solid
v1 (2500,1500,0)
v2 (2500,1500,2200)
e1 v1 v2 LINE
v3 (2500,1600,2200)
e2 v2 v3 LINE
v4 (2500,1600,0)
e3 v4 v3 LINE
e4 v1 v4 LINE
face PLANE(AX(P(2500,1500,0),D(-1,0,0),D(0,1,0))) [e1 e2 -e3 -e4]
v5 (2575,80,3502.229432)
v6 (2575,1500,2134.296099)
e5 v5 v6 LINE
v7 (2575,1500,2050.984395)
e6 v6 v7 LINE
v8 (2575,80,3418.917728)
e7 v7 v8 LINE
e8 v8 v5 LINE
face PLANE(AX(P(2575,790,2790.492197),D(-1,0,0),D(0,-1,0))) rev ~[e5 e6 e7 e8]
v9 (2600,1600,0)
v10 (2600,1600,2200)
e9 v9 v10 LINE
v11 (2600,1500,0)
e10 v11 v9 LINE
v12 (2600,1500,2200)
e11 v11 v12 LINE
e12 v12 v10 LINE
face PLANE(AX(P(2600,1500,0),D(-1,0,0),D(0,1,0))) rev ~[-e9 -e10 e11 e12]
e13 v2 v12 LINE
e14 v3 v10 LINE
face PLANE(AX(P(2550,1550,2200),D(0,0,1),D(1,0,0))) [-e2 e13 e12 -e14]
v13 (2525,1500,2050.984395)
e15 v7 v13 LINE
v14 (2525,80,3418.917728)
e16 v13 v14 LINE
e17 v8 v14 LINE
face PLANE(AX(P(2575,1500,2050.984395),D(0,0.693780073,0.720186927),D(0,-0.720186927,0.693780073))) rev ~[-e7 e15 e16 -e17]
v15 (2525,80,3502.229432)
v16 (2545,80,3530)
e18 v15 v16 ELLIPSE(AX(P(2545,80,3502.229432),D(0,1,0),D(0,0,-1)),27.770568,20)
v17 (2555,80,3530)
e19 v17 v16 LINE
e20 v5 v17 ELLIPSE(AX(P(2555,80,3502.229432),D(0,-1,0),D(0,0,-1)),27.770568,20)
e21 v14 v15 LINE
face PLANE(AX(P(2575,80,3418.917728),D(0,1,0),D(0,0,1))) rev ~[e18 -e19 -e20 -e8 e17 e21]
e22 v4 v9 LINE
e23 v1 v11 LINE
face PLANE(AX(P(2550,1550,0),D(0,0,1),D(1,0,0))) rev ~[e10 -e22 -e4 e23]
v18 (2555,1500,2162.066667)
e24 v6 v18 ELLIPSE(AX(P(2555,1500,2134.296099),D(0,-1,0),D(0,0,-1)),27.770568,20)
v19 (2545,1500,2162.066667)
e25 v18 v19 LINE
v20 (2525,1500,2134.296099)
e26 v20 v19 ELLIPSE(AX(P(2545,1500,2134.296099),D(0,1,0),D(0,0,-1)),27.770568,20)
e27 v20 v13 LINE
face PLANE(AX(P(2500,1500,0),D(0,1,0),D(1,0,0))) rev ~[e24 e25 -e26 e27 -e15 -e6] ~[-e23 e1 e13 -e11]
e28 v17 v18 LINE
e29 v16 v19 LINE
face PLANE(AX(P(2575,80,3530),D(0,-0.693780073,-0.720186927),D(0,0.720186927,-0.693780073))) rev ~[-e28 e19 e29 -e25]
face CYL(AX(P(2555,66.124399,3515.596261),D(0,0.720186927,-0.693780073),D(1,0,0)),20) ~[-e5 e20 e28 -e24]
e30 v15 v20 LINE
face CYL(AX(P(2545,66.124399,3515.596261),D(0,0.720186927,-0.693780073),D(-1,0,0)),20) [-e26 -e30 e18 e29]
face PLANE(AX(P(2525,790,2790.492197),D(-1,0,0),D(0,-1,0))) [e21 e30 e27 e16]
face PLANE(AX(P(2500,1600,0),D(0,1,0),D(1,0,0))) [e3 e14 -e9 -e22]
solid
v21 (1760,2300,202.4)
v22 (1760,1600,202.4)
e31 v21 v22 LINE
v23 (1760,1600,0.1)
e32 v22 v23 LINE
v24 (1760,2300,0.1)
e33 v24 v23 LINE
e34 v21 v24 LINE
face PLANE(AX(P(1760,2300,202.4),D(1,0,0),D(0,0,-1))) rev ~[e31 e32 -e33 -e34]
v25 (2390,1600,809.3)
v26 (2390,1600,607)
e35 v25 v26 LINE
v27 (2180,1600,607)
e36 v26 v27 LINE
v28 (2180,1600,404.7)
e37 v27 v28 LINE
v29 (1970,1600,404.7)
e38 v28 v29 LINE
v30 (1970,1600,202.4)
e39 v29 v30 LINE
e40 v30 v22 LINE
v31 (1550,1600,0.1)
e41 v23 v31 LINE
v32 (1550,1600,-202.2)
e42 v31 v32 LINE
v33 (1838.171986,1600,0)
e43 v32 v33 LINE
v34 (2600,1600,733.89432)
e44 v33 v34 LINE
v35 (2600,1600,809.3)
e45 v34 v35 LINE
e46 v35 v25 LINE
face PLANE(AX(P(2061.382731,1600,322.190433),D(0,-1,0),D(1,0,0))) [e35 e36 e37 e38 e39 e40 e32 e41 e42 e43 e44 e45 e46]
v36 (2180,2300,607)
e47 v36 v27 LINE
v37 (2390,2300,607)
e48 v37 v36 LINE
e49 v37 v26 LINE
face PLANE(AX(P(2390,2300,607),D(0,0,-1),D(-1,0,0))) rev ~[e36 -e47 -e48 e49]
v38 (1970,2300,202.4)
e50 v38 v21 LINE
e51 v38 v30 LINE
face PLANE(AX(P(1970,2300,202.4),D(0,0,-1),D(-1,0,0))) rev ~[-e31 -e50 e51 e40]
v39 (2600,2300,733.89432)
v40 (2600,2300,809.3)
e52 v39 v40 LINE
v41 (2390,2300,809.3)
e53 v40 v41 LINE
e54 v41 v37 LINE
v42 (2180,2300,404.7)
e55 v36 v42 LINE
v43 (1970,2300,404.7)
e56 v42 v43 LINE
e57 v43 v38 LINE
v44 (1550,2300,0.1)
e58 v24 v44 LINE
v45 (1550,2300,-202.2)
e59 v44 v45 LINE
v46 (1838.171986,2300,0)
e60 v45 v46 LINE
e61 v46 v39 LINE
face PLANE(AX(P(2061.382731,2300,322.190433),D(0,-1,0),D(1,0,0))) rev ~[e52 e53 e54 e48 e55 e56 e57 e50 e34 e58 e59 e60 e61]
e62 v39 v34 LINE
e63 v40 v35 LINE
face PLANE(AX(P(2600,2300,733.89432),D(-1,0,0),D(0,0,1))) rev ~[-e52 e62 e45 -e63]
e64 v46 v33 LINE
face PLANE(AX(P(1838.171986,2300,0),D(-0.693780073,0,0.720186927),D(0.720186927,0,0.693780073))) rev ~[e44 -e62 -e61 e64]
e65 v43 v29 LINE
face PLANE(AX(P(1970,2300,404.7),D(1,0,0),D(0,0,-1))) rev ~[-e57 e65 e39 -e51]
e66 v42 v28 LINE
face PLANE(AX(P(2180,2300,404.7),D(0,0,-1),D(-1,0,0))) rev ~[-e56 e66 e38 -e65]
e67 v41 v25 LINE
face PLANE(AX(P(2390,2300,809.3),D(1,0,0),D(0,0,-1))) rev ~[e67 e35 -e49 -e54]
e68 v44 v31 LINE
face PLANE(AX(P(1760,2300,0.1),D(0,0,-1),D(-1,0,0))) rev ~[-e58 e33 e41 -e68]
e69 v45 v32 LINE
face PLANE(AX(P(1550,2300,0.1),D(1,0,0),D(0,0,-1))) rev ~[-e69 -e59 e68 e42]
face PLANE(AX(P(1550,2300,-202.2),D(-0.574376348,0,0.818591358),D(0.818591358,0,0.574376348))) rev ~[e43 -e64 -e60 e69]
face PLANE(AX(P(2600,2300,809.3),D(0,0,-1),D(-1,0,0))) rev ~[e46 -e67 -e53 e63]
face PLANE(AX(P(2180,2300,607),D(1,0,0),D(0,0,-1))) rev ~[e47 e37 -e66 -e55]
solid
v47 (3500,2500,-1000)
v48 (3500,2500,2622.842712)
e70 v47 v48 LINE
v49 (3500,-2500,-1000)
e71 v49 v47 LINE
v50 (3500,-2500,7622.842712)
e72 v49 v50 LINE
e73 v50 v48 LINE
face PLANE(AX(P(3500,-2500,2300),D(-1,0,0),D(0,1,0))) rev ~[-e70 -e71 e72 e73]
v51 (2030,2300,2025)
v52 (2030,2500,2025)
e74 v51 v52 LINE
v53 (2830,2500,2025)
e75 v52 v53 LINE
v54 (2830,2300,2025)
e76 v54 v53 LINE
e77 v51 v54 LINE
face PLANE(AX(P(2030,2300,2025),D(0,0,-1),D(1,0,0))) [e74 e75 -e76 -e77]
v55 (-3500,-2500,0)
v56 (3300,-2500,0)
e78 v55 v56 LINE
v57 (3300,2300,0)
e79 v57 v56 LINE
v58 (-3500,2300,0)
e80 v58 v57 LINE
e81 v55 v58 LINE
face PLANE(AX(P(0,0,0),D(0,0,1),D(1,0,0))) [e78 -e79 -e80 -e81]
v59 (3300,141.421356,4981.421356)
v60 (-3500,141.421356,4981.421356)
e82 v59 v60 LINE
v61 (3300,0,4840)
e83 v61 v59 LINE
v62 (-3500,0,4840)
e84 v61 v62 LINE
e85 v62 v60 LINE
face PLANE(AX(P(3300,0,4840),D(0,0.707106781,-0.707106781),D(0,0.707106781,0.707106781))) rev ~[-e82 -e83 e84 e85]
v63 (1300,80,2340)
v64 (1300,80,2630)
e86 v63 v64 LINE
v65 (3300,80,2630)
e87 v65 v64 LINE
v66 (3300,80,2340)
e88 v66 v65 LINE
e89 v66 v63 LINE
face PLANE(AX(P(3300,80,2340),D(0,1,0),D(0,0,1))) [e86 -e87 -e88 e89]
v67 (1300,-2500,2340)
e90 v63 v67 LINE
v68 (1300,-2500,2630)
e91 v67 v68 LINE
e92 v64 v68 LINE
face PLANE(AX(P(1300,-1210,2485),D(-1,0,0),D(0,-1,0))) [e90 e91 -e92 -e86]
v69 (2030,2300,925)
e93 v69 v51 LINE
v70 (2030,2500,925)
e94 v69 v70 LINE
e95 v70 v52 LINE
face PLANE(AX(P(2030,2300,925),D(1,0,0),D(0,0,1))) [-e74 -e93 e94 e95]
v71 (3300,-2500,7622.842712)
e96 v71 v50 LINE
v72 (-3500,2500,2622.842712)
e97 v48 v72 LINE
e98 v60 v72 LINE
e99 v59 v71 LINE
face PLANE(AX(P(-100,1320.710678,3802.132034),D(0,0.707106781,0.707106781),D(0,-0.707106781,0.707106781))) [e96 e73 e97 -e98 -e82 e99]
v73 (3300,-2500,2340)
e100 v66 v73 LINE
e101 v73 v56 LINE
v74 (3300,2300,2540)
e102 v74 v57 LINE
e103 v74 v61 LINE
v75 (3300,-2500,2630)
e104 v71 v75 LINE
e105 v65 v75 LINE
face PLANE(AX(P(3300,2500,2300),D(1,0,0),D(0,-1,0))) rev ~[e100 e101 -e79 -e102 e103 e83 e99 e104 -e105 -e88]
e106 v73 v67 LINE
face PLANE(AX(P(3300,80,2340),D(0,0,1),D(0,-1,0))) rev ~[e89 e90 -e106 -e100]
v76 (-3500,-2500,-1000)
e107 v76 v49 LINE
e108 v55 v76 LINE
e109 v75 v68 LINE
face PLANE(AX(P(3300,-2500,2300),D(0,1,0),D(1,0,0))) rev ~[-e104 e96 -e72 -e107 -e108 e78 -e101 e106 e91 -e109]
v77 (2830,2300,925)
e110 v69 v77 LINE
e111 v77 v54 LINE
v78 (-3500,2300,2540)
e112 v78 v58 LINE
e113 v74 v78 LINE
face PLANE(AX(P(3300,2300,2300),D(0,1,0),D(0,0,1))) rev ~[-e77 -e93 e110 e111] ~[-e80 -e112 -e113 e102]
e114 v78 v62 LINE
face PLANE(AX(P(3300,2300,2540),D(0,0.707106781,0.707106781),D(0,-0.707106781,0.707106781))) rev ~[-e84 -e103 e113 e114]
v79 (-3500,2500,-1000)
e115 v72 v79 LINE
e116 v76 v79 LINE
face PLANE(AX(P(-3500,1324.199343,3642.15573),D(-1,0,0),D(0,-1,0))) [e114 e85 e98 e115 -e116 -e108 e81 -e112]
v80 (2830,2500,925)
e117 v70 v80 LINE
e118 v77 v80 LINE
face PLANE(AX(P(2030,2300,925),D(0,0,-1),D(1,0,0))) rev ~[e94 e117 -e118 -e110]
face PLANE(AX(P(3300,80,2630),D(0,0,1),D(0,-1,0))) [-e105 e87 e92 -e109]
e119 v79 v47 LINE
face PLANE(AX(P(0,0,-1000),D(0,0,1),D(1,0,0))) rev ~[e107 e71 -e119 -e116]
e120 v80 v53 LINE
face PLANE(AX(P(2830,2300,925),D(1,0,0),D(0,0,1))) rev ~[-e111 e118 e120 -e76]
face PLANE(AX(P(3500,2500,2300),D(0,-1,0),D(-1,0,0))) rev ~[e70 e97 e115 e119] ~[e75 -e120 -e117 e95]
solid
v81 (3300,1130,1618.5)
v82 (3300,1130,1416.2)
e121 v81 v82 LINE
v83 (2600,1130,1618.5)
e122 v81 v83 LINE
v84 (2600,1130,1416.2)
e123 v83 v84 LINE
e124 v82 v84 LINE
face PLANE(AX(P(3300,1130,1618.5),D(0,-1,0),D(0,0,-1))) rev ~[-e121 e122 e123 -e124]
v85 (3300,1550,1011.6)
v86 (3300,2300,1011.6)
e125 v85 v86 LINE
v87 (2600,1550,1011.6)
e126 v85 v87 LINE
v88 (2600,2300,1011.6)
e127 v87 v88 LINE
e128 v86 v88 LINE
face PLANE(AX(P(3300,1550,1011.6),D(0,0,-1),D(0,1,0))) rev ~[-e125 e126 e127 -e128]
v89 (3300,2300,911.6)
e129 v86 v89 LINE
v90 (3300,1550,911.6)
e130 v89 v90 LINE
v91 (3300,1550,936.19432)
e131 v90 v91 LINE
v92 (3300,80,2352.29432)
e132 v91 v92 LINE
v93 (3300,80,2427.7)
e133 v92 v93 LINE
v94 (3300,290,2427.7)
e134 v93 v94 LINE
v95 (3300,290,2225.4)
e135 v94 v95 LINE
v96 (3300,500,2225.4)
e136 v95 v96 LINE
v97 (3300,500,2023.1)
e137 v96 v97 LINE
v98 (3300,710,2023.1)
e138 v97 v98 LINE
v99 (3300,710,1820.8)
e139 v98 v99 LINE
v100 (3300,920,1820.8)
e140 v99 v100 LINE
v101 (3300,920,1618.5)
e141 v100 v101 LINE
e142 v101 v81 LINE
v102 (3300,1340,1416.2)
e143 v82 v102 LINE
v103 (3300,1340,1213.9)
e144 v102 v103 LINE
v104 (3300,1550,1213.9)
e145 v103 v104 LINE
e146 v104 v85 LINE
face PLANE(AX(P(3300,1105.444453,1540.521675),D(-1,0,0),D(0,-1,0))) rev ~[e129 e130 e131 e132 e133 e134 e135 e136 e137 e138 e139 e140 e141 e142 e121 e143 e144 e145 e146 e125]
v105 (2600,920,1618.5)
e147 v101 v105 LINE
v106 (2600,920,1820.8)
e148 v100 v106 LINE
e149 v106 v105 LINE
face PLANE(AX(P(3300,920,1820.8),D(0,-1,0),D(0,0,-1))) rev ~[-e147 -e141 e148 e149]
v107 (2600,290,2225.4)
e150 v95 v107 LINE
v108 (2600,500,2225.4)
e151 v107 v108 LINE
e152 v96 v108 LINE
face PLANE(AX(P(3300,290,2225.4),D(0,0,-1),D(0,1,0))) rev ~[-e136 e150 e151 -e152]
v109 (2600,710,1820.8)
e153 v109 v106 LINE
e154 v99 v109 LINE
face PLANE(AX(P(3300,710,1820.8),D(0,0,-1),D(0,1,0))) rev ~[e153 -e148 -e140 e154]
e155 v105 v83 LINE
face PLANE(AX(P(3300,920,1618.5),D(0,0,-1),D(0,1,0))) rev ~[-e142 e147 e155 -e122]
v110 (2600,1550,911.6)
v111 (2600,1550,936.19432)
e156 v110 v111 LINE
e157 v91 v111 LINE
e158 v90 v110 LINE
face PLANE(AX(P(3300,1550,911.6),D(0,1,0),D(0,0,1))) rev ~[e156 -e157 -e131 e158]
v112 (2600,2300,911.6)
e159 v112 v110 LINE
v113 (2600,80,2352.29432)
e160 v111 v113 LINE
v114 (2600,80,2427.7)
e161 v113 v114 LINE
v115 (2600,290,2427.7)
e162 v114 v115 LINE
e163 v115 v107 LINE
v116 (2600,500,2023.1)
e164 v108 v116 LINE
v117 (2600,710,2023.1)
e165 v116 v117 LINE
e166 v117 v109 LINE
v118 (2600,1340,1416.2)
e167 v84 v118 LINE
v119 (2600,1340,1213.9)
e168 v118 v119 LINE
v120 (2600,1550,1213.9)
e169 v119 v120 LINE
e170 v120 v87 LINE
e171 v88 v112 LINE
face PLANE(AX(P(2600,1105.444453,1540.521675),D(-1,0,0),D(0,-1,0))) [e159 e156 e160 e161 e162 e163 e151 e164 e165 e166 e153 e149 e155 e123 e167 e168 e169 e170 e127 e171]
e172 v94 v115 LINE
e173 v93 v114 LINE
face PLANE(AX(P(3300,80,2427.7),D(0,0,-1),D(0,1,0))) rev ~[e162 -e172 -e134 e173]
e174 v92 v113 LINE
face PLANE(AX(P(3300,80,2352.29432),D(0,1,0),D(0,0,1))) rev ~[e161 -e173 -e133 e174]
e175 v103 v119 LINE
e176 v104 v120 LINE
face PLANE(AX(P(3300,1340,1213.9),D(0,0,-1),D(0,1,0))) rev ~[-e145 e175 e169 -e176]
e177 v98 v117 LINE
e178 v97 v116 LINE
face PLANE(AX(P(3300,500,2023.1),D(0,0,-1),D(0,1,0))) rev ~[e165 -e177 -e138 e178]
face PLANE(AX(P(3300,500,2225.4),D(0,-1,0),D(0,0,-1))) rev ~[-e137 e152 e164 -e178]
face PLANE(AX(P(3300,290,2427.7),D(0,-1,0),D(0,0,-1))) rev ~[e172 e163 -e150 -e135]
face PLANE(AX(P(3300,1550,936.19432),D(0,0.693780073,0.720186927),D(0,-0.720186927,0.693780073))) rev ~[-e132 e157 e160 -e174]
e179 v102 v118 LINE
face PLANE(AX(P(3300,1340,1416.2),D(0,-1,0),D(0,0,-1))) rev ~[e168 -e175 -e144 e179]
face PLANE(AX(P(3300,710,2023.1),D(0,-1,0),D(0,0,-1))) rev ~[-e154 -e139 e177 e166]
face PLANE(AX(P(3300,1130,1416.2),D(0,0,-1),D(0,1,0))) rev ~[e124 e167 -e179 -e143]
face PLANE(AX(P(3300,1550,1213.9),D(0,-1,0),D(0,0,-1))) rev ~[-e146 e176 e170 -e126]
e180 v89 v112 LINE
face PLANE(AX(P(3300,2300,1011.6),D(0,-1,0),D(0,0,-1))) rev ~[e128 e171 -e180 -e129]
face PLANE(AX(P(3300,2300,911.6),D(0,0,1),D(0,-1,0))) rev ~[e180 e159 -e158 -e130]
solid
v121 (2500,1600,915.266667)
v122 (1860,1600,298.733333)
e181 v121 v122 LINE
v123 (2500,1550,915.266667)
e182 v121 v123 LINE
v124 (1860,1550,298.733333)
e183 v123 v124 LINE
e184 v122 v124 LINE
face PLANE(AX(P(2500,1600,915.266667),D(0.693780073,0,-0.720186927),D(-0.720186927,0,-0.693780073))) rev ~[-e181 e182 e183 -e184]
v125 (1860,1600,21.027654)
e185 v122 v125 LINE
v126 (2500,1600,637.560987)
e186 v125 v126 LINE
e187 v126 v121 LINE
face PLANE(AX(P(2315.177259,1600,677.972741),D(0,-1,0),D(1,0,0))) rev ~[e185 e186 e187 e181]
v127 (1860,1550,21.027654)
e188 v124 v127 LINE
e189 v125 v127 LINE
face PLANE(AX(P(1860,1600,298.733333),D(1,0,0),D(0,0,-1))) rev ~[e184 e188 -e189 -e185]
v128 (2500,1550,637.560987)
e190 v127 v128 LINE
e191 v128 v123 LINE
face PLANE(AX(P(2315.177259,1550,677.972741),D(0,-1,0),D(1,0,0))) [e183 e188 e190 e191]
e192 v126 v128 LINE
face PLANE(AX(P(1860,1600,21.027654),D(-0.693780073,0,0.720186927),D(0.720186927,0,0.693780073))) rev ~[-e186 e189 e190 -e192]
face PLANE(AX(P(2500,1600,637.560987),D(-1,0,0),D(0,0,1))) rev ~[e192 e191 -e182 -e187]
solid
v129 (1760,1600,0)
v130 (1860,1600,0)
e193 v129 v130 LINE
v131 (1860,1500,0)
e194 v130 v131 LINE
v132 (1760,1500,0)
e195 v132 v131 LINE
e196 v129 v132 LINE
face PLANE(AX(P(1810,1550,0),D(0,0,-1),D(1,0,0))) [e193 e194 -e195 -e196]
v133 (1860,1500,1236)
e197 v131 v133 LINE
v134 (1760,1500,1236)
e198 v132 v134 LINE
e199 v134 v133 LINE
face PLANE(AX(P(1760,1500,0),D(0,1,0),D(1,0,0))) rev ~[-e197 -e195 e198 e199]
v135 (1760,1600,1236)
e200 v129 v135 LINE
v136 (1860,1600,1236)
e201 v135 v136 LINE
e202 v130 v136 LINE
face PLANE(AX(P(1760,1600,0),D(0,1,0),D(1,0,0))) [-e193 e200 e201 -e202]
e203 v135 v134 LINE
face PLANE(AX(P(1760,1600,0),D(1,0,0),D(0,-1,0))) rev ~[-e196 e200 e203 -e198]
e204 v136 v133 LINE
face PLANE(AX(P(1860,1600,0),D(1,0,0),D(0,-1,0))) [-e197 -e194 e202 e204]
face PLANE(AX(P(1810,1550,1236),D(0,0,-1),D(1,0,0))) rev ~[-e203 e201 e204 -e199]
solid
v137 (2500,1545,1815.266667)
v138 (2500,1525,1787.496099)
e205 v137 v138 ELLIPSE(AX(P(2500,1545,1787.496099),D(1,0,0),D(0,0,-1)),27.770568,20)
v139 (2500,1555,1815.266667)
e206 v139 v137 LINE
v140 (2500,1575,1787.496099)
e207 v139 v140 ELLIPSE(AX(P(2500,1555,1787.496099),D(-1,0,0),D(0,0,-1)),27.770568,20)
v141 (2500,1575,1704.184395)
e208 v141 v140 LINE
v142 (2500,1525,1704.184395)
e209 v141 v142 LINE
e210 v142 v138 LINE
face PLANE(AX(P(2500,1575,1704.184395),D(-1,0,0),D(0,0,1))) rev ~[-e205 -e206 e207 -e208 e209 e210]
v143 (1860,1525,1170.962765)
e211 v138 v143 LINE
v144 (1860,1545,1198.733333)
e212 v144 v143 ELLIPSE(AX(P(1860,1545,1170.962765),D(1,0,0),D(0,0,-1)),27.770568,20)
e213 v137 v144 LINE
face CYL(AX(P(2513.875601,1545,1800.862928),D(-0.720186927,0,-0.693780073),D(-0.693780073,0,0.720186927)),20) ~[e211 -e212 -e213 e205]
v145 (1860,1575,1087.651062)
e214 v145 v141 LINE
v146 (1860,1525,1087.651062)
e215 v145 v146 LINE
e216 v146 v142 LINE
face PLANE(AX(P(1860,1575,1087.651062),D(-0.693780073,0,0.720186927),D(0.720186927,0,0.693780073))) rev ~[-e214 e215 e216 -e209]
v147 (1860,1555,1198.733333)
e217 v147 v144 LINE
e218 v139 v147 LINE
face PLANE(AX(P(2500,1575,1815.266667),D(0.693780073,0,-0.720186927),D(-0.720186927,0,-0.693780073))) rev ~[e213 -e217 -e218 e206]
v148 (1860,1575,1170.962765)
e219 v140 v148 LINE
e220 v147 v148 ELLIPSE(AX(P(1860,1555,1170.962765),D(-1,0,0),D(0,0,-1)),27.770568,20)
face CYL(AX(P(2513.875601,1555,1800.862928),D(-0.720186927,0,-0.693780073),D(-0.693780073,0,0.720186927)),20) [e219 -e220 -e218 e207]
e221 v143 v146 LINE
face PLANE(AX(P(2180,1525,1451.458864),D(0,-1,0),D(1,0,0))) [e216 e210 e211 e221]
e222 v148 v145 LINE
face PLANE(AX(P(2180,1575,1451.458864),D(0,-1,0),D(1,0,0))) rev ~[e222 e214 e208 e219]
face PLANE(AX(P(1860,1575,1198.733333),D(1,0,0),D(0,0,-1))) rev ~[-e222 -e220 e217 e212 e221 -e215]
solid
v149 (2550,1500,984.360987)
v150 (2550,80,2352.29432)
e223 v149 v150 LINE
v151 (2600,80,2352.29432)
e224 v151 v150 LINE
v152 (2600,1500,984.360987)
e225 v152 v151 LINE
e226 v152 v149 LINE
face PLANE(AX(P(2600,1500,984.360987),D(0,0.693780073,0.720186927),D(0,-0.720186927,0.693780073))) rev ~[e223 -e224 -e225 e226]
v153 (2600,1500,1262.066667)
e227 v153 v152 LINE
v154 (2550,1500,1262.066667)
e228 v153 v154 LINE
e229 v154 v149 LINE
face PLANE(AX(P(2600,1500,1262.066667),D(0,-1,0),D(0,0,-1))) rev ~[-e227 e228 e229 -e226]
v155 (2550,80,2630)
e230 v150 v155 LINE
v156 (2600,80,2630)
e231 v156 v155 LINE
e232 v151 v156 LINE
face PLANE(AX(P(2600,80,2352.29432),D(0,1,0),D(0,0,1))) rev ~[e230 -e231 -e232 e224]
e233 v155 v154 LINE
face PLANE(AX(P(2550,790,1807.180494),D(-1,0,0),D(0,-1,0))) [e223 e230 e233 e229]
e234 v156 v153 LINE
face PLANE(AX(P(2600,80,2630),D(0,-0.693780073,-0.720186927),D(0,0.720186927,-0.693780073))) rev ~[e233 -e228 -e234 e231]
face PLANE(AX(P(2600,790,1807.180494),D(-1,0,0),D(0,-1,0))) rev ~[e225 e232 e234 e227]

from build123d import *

# Parameters (mm, degrees)
F0_W      = 7000
F0_H      = 5000
F1_DEPTH  = 1000
F3_DEPTH  = 2300
F5_DEPTH  = 6800
F6_REACH  = 7685.420757516
F7_W      = 2580
F7_H      = 290
F8_DEPTH  = 2000
F10_DEPTH = 700
F12_DEPTH = 700
F13_W     = 800
F13_H     = 1100
F14_DEPTH = 200.001
F15_W     = 100
F15_H     = 100
F16_DEPTH = 2200
F18_START = 25
F18_DEPTH = 50
F19_W     = 100
F19_H     = 100
F20_DEPTH = 1236
F23_DEPTH = 50
F25_DEPTH = 50
F26_START = 25
F26_DEPTH = 50
F27_R     = 20
F27_2_R   = 20


with BuildPart() as f1:
    # F0 (on Top) → F1 (new body)
    with BuildSketch(Plane.XY):
        Rectangle(F0_W, F0_H)
    extrude(amount=-F1_DEPTH)

    # F2 (on face) → F3 (join)
    with BuildSketch(Plane.XY):
        Polygon((3500, -2500), (3500, 2500), (-3500, 2500), (-3500, 2300), (3300, 2300), (3300, -2500), align=None)
    extrude(amount=F3_DEPTH)

    # F4 (on face) → F5 (join, through all)
    with BuildSketch(Plane(origin=(3300, 0, 0), x_dir=(0, -1, 0), z_dir=(-1, 0, 0))):
        Polygon((-2300, 2300), (-2300, 2540), (0, 4840), (-141.4213562373, 4981.4213562373), (-2500, 2622.8427124746), (-2500, 2300), align=None)
    extrude(amount=F5_DEPTH)

    f6_end = Plane(origin=(-100, 1320.7106781187, 3802.132034356), x_dir=(0, -0.7071067812, 0.7071067812), z_dir=(0, 0.7071067812, 0.7071067812))
    # F3_face (on face) → F6 (join, up to a plane its end follows)
    with BuildSketch(Plane(origin=(3400, 0, 2300), x_dir=(1, 0, 0), z_dir=(0, 0, 1))):
        Polygon((-100, -2500), (100, -2500), (100, 2500), (-100, 2500), (-100, 2300), align=None)
    f6_long = extrude(amount=F6_REACH, mode=Mode.PRIVATE)
    add(split(f6_long, bisect_by=f6_end, keep=Keep.BOTTOM, mode=Mode.PRIVATE))

    # F7 (on face) → F8 (join)
    with BuildSketch(Plane(origin=(3300, 0, 0), x_dir=(0, -1, 0), z_dir=(-1, 0, 0))):
        with Locations((1210, 2485)):
            Rectangle(F7_W, F7_H)
    extrude(amount=F8_DEPTH)

    # F13 (on face) → F14 (cut, through all)
    with BuildSketch(Plane.XZ.offset(-2300)):
        with Locations((2430, 1475)):
            Rectangle(F13_W, F13_H)
    extrude(amount=-F14_DEPTH, mode=Mode.SUBTRACT)


with BuildPart() as f10:
    # F9 (on face) → F10 (new body)
    with BuildSketch(Plane(origin=(3300, 0, 0), x_dir=(0, -1, 0), z_dir=(-1, 0, 0))):
        Polygon((-80, 2427.7), (-290, 2427.7), (-290, 2225.4), (-500, 2225.4), (-500, 2023.1), (-710, 2023.1), (-710, 1820.8), (-920, 1820.8), (-920, 1618.5), (-1130, 1618.5), (-1130, 1416.2), (-1340, 1416.2), (-1340, 1213.9), (-1550, 1213.9), (-1550, 1011.6), (-2300, 1011.6), (-2300, 911.6), (-1550, 911.6), (-1550, 936.1943204678), (-80, 2352.2943204678), align=None)
    extrude(amount=F10_DEPTH)


with BuildPart() as f12:
    # F11 (on face) → F12 (new body)
    with BuildSketch(Plane.XZ.offset(-2300)):
        Polygon((2600, 733.8943204678), (2600, 809.3), (2390, 809.3), (2390, 607), (2180, 607), (2180, 404.7), (1970, 404.7), (1970, 202.4), (1760, 202.4), (1760, 0.1), (1550, 0.1), (1550, -202.2), (1838.1719856736, 0), align=None)
    extrude(amount=F12_DEPTH)


with BuildPart() as f16:
    # F15 (on face) → F16 (new body)
    with BuildSketch(Plane.XY):
        with Locations((2550, 1550)):
            Rectangle(F15_W, F15_H)
    extrude(amount=F16_DEPTH)

    # F17 (on face) → F18 (join)
    with BuildSketch(Plane(origin=(2600, 0, 0), x_dir=(0, -1, 0), z_dir=(-1, 0, 0)).offset(F18_START)):
        Polygon((-80, 3530), (-1500, 2162.0666666667), (-1500, 2050.9843948538), (-80, 3418.9177281871), align=None)
    extrude(amount=F18_DEPTH)

    # F27
    f27_edges = [f16.edges().sort_by_distance(p)[0] for p in [
        (2525, 790, 2846.033333),
        (2575, 790, 2846.033333),
    ]]
    fillet(f27_edges, radius=F27_R)


with BuildPart() as f20:
    # F19 (on face) → F20 (new body)
    with BuildSketch(Plane(origin=(0, 0, 0), x_dir=(1, 0, 0), z_dir=(0, 0, -1))):
        with Locations((1810, -1550)):
            Rectangle(F19_W, F19_H)
    extrude(amount=-F20_DEPTH)


with BuildPart() as f23:
    # F22 (on face) → F23 (new body)
    with BuildSketch(Plane.XZ.offset(-1600)):
        Polygon((2390, 607), (2390, 809.3), (2180, 607), align=None)
        Polygon((1860, 202.4), (1860, 21.0276538011), (2500, 637.5609871345), (2500, 809.3), (2390, 809.3), (2390, 607), (2180, 607), (2180, 404.7), (1970, 404.7), (1970, 202.4), align=None)
        Polygon((2180, 607), (1970, 404.7), (2180, 404.7), align=None)
        Polygon((1860, 298.7333333333), (1860, 202.4), (1970, 202.4), (1970, 404.7), align=None)
        Polygon((2390, 809.3), (2500, 809.3), (2500, 915.2666666667), align=None)
    extrude(amount=F23_DEPTH)


with BuildPart() as f25:
    # F24 (on face) → F25 (new body)
    with BuildSketch(Plane(origin=(2600, 0, 0), x_dir=(0, -1, 0), z_dir=(-1, 0, 0))):
        Polygon((-1500, 1262.0666666667), (-1500, 984.3609871345), (-80, 2352.2943204678), (-80, 2630), align=None)
    extrude(amount=F25_DEPTH)


with BuildPart() as f26:
    # F21 (on face) → F26 (new body)
    with BuildSketch(Plane.XZ.offset(-1600).offset(F26_START)):
        Polygon((2500, 1815.2666666667), (1860, 1198.7333333333), (1860, 1087.6510615204), (2500, 1704.1843948538), align=None)
    extrude(amount=F26_DEPTH)

    # F27#2
    f27_2_edges = [f26.edges().sort_by_distance(p)[0] for p in [
        (2180, 1575, 1507),
        (2180, 1525, 1507),
    ]]
    fillet(f27_2_edges, radius=F27_2_R)


solid = Compound([f1.part, f10.part, f12.part, f16.part, f20.part, f23.part, f25.part, f26.part])
